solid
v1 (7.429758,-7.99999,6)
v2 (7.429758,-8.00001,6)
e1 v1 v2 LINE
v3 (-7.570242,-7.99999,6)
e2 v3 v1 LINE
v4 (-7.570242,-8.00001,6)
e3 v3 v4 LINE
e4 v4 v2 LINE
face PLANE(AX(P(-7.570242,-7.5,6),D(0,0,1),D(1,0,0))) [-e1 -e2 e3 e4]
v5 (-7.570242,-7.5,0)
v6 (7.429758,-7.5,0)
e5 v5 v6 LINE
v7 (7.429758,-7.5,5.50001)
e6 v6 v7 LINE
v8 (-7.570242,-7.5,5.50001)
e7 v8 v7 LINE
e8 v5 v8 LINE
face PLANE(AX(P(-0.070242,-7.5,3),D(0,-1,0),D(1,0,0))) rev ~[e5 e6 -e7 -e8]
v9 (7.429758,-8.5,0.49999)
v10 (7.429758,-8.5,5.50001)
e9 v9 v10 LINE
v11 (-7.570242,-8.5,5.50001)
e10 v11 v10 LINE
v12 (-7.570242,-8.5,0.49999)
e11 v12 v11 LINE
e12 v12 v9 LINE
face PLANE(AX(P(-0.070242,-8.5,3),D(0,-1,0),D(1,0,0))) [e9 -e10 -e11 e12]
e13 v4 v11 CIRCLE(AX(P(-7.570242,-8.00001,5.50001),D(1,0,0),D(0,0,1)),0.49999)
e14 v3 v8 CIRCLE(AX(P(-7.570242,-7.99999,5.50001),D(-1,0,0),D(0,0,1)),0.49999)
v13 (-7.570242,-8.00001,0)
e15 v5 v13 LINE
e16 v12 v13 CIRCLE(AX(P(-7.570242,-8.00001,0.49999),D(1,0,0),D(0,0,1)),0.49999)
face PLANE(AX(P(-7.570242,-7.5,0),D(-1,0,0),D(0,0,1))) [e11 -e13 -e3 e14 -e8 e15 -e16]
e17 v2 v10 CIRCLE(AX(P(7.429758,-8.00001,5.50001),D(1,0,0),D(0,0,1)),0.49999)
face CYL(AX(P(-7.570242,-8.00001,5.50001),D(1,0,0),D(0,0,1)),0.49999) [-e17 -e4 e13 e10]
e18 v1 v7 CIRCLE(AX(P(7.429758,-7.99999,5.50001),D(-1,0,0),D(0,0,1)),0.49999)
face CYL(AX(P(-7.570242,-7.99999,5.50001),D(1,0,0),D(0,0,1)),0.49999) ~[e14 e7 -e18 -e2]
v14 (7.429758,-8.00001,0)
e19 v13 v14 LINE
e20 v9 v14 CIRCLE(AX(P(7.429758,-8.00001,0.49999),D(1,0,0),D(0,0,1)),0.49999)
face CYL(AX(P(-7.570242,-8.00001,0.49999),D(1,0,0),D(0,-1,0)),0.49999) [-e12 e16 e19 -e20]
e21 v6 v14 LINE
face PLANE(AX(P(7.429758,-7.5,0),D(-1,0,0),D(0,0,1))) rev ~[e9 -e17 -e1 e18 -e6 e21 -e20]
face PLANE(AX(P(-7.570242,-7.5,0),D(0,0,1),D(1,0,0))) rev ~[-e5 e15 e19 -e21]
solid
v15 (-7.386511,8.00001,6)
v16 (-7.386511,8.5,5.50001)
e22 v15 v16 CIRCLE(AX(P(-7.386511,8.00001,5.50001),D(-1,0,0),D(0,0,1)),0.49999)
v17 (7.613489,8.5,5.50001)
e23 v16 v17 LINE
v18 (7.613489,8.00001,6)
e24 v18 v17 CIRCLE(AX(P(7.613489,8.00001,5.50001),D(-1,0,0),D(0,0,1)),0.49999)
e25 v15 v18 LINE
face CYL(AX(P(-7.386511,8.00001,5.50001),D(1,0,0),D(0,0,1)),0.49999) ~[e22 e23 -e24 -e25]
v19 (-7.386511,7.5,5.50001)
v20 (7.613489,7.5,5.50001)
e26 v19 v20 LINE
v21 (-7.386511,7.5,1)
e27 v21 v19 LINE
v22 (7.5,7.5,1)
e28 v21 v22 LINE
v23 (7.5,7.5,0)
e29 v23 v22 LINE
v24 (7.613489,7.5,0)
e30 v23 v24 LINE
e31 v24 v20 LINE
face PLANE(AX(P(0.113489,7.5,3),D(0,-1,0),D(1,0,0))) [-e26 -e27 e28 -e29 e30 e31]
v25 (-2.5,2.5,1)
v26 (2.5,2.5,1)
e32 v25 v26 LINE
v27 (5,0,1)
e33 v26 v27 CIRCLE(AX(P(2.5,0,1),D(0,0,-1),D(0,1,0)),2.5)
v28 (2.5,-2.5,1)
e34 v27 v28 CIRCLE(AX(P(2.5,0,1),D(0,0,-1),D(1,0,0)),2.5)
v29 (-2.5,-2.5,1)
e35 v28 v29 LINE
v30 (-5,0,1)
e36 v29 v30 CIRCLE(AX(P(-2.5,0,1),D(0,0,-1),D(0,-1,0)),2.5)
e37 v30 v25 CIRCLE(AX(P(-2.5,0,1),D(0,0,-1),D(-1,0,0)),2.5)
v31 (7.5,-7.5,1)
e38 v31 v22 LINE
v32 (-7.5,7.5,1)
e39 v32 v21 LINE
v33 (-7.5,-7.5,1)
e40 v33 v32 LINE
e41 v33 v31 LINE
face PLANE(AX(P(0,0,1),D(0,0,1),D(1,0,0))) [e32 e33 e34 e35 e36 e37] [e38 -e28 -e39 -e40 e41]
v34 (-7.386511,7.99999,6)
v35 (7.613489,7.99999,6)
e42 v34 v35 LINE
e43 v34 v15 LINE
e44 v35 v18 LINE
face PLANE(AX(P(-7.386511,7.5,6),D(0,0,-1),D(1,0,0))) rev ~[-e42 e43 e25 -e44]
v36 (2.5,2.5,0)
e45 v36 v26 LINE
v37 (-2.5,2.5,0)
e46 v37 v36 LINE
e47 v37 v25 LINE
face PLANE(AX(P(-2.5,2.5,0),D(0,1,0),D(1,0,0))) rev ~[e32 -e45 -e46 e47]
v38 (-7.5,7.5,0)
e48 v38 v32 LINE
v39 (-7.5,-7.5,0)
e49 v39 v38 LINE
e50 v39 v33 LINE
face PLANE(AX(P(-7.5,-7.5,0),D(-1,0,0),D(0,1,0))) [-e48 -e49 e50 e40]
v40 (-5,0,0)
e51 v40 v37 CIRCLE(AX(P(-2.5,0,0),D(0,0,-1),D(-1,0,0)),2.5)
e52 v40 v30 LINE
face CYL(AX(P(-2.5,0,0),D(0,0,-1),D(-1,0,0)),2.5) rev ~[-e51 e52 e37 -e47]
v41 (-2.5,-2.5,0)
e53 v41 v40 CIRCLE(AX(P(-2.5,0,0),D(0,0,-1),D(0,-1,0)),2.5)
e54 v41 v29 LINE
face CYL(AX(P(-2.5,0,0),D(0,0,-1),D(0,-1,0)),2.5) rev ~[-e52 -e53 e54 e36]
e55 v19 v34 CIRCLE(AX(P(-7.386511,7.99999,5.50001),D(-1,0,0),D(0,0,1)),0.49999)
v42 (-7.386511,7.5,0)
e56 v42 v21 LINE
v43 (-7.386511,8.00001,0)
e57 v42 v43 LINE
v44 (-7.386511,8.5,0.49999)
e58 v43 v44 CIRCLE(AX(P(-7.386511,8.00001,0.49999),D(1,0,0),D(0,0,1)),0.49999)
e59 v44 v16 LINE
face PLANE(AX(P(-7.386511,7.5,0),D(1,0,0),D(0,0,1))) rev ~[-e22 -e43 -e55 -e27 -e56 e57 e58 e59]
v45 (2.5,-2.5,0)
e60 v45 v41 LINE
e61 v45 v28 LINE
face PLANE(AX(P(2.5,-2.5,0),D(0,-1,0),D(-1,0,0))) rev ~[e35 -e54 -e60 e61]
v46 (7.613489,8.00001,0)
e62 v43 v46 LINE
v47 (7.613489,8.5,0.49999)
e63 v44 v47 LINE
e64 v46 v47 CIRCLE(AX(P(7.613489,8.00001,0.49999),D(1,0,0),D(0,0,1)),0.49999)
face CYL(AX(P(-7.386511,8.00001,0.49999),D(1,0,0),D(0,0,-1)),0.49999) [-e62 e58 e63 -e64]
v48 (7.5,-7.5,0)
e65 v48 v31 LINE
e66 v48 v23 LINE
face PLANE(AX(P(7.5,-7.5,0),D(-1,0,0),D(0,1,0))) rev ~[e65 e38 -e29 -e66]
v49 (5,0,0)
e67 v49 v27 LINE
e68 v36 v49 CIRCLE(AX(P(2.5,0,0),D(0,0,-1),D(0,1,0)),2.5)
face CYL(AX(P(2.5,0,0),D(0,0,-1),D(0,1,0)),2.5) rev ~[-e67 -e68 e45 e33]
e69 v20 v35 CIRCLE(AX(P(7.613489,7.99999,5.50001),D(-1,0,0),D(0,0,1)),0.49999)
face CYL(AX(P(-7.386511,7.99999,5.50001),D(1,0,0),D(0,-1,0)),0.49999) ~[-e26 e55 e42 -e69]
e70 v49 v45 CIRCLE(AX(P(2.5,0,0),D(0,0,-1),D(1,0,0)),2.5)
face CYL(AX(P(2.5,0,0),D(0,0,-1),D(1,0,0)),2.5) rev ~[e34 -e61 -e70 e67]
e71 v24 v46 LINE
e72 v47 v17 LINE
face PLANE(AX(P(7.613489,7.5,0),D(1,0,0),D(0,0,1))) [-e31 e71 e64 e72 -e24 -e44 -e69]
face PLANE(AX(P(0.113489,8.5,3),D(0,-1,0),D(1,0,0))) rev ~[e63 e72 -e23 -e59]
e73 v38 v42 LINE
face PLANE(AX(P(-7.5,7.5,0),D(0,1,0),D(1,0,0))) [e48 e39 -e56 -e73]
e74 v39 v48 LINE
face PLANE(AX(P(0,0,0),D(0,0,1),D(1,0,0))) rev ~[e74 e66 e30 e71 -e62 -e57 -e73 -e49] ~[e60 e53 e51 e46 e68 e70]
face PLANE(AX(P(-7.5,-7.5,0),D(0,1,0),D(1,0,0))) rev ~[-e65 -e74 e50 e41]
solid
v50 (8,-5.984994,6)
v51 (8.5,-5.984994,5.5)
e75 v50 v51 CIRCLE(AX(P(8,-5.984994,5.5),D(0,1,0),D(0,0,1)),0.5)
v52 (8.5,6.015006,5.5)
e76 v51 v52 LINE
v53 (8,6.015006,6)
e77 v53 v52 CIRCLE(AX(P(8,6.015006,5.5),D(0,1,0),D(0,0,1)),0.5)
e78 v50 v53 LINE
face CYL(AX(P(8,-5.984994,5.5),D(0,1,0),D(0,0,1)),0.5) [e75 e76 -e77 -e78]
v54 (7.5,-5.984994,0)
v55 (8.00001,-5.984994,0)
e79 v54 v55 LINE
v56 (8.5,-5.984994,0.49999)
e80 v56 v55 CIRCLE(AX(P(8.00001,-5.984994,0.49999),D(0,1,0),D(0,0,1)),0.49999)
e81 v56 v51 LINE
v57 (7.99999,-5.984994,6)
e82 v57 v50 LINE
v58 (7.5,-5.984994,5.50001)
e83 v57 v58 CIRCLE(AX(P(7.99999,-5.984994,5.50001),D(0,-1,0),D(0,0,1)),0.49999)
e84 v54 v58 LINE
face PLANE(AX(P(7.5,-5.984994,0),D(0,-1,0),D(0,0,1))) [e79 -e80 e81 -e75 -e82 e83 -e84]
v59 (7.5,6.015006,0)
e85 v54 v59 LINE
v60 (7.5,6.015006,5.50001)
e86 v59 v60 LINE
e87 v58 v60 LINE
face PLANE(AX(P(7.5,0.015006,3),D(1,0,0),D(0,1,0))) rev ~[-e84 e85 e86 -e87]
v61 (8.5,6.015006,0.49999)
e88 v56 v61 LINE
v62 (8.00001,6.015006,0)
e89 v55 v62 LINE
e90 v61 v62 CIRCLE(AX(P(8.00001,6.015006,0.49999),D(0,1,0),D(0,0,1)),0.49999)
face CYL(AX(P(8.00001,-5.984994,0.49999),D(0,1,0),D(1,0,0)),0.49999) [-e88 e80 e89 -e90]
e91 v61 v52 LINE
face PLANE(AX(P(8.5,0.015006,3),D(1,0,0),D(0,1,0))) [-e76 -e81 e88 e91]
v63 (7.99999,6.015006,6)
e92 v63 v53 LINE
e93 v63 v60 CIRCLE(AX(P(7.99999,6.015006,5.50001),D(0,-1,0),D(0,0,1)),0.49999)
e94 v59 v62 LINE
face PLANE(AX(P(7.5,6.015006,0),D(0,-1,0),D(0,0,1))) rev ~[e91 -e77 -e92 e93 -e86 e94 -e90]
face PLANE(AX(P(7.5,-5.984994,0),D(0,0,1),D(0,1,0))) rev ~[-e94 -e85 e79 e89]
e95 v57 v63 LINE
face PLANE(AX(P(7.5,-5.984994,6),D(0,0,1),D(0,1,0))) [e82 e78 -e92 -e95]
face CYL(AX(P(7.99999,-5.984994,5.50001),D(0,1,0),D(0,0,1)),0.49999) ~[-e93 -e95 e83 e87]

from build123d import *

# Parameters (mm, degrees)
F9_W      = 12
F9_H      = 6
F10_DEPTH = 1
F8_W      = 15
F8_H      = 6
F11_DEPTH = 1
F7_W      = 15
F7_H      = 6
F12_DEPTH = 1
F0_W      = 15
F0_H      = 15
F13_DEPTH = 1
F14_R     = 0.5
F15_R     = 0.49999
F15_2_R   = 0.49999
F16_R     = 0.49999
F16_2_R   = 0.49999
F17_DEPTH = 1


# Not quite as in the source:
# - a fillet or chamfer is up to 0.001 mm smaller than in the source, because OpenCascade refuses the exact size


with BuildPart() as f10:
    # F9 (on plane+point) → F10 (new body)
    with BuildSketch(Plane.YZ.offset(7.5)):
        with Locations((0.0150063767, 3)):
            Rectangle(F9_W, F9_H)
    extrude(amount=F10_DEPTH)

    # F14
    f14_edges = [f10.edges().sort_by_distance(p)[0] for p in [
        (8.5, 0.015006, 6),
    ]]
    fillet(f14_edges, radius=F14_R)

    # F15 (radius 0.5 in the source; OpenCascade refuses exactly that, so slightly less here)
    f15_edges = [f10.edges().sort_by_distance(p)[0] for p in [
        (7.5, 0.015006, 6),
        (8.5, 0.015006, 0),
    ]]
    fillet(f15_edges, radius=F15_R)

    # F0 (on Top) → F17 (cut)
    with BuildSketch(Plane.XY):
        with BuildLine():
            Line((2.5, 2.5), (-2.5, 2.5))
            ThreePointArc((-2.5, 2.5), (-4.267766953, 1.767766953), (-5, 0))
            ThreePointArc((-5, 0), (-4.267766953, -1.767766953), (-2.5, -2.5))
            Line((-2.5, -2.5), (2.5, -2.5))
            ThreePointArc((2.5, -2.5), (4.267766953, -1.767766953), (5, 0))
            ThreePointArc((5, 0), (4.267766953, 1.767766953), (2.5, 2.5))
        make_face()
    extrude(amount=F17_DEPTH, mode=Mode.SUBTRACT)


with BuildPart() as f11:
    # F8 (on plane+point) → F11 (new body)
    with BuildSketch(Plane.XZ.offset(-7.5)):
        with Locations((0.1134890686, 3)):
            Rectangle(F8_W, F8_H)
    extrude(amount=-F11_DEPTH)

    # F0 (on Top) → F13 (join)
    with BuildSketch(Plane.XY):
        Rectangle(F0_W, F0_H)
        with BuildLine():
            ThreePointArc((-5, 0), (-4.267766953, 1.767766953), (-2.5, 2.5))
            Line((-2.5, 2.5), (2.5, 2.5))
            ThreePointArc((2.5, 2.5), (4.267766953, 1.767766953), (5, 0))
            ThreePointArc((5, 0), (4.267766953, -1.767766953), (2.5, -2.5))
            Line((2.5, -2.5), (-2.5, -2.5))
            ThreePointArc((-2.5, -2.5), (-4.267766953, -1.767766953), (-5, 0))
        make_face(mode=Mode.SUBTRACT)
    extrude(amount=F13_DEPTH)

    # F16#2 (radius 0.5 in the source; OpenCascade refuses exactly that, so slightly less here)
    f16_2_edges = [f11.edges().sort_by_distance(p)[0] for p in [
        (0.113489, 8.5, 0),
        (0.113489, 8.5, 6),
        (0.113489, 7.5, 6),
    ]]
    fillet(f16_2_edges, radius=F16_2_R)


with BuildPart() as f12:
    # F7 (on plane+point) → F12 (new body)
    with BuildSketch(Plane.XZ.offset(7.5)):
        with Locations((-0.0702422911, 3)):
            Rectangle(F7_W, F7_H)
    extrude(amount=F12_DEPTH)

    # F15#2 (radius 0.5 in the source; OpenCascade refuses exactly that, so slightly less here)
    f15_2_edges = [f12.edges().sort_by_distance(p)[0] for p in [
        (-0.070242, -8.5, 6),
        (-0.070242, -7.5, 6),
    ]]
    fillet(f15_2_edges, radius=F15_2_R)

    # F16 (radius 0.5 in the source; OpenCascade refuses exactly that, so slightly less here)
    f16_edges = [f12.edges().sort_by_distance(p)[0] for p in [
        (-0.070242, -8.5, 0),
    ]]
    fillet(f16_edges, radius=F16_R)


solid = Compound([f10.part, f11.part, f12.part])
